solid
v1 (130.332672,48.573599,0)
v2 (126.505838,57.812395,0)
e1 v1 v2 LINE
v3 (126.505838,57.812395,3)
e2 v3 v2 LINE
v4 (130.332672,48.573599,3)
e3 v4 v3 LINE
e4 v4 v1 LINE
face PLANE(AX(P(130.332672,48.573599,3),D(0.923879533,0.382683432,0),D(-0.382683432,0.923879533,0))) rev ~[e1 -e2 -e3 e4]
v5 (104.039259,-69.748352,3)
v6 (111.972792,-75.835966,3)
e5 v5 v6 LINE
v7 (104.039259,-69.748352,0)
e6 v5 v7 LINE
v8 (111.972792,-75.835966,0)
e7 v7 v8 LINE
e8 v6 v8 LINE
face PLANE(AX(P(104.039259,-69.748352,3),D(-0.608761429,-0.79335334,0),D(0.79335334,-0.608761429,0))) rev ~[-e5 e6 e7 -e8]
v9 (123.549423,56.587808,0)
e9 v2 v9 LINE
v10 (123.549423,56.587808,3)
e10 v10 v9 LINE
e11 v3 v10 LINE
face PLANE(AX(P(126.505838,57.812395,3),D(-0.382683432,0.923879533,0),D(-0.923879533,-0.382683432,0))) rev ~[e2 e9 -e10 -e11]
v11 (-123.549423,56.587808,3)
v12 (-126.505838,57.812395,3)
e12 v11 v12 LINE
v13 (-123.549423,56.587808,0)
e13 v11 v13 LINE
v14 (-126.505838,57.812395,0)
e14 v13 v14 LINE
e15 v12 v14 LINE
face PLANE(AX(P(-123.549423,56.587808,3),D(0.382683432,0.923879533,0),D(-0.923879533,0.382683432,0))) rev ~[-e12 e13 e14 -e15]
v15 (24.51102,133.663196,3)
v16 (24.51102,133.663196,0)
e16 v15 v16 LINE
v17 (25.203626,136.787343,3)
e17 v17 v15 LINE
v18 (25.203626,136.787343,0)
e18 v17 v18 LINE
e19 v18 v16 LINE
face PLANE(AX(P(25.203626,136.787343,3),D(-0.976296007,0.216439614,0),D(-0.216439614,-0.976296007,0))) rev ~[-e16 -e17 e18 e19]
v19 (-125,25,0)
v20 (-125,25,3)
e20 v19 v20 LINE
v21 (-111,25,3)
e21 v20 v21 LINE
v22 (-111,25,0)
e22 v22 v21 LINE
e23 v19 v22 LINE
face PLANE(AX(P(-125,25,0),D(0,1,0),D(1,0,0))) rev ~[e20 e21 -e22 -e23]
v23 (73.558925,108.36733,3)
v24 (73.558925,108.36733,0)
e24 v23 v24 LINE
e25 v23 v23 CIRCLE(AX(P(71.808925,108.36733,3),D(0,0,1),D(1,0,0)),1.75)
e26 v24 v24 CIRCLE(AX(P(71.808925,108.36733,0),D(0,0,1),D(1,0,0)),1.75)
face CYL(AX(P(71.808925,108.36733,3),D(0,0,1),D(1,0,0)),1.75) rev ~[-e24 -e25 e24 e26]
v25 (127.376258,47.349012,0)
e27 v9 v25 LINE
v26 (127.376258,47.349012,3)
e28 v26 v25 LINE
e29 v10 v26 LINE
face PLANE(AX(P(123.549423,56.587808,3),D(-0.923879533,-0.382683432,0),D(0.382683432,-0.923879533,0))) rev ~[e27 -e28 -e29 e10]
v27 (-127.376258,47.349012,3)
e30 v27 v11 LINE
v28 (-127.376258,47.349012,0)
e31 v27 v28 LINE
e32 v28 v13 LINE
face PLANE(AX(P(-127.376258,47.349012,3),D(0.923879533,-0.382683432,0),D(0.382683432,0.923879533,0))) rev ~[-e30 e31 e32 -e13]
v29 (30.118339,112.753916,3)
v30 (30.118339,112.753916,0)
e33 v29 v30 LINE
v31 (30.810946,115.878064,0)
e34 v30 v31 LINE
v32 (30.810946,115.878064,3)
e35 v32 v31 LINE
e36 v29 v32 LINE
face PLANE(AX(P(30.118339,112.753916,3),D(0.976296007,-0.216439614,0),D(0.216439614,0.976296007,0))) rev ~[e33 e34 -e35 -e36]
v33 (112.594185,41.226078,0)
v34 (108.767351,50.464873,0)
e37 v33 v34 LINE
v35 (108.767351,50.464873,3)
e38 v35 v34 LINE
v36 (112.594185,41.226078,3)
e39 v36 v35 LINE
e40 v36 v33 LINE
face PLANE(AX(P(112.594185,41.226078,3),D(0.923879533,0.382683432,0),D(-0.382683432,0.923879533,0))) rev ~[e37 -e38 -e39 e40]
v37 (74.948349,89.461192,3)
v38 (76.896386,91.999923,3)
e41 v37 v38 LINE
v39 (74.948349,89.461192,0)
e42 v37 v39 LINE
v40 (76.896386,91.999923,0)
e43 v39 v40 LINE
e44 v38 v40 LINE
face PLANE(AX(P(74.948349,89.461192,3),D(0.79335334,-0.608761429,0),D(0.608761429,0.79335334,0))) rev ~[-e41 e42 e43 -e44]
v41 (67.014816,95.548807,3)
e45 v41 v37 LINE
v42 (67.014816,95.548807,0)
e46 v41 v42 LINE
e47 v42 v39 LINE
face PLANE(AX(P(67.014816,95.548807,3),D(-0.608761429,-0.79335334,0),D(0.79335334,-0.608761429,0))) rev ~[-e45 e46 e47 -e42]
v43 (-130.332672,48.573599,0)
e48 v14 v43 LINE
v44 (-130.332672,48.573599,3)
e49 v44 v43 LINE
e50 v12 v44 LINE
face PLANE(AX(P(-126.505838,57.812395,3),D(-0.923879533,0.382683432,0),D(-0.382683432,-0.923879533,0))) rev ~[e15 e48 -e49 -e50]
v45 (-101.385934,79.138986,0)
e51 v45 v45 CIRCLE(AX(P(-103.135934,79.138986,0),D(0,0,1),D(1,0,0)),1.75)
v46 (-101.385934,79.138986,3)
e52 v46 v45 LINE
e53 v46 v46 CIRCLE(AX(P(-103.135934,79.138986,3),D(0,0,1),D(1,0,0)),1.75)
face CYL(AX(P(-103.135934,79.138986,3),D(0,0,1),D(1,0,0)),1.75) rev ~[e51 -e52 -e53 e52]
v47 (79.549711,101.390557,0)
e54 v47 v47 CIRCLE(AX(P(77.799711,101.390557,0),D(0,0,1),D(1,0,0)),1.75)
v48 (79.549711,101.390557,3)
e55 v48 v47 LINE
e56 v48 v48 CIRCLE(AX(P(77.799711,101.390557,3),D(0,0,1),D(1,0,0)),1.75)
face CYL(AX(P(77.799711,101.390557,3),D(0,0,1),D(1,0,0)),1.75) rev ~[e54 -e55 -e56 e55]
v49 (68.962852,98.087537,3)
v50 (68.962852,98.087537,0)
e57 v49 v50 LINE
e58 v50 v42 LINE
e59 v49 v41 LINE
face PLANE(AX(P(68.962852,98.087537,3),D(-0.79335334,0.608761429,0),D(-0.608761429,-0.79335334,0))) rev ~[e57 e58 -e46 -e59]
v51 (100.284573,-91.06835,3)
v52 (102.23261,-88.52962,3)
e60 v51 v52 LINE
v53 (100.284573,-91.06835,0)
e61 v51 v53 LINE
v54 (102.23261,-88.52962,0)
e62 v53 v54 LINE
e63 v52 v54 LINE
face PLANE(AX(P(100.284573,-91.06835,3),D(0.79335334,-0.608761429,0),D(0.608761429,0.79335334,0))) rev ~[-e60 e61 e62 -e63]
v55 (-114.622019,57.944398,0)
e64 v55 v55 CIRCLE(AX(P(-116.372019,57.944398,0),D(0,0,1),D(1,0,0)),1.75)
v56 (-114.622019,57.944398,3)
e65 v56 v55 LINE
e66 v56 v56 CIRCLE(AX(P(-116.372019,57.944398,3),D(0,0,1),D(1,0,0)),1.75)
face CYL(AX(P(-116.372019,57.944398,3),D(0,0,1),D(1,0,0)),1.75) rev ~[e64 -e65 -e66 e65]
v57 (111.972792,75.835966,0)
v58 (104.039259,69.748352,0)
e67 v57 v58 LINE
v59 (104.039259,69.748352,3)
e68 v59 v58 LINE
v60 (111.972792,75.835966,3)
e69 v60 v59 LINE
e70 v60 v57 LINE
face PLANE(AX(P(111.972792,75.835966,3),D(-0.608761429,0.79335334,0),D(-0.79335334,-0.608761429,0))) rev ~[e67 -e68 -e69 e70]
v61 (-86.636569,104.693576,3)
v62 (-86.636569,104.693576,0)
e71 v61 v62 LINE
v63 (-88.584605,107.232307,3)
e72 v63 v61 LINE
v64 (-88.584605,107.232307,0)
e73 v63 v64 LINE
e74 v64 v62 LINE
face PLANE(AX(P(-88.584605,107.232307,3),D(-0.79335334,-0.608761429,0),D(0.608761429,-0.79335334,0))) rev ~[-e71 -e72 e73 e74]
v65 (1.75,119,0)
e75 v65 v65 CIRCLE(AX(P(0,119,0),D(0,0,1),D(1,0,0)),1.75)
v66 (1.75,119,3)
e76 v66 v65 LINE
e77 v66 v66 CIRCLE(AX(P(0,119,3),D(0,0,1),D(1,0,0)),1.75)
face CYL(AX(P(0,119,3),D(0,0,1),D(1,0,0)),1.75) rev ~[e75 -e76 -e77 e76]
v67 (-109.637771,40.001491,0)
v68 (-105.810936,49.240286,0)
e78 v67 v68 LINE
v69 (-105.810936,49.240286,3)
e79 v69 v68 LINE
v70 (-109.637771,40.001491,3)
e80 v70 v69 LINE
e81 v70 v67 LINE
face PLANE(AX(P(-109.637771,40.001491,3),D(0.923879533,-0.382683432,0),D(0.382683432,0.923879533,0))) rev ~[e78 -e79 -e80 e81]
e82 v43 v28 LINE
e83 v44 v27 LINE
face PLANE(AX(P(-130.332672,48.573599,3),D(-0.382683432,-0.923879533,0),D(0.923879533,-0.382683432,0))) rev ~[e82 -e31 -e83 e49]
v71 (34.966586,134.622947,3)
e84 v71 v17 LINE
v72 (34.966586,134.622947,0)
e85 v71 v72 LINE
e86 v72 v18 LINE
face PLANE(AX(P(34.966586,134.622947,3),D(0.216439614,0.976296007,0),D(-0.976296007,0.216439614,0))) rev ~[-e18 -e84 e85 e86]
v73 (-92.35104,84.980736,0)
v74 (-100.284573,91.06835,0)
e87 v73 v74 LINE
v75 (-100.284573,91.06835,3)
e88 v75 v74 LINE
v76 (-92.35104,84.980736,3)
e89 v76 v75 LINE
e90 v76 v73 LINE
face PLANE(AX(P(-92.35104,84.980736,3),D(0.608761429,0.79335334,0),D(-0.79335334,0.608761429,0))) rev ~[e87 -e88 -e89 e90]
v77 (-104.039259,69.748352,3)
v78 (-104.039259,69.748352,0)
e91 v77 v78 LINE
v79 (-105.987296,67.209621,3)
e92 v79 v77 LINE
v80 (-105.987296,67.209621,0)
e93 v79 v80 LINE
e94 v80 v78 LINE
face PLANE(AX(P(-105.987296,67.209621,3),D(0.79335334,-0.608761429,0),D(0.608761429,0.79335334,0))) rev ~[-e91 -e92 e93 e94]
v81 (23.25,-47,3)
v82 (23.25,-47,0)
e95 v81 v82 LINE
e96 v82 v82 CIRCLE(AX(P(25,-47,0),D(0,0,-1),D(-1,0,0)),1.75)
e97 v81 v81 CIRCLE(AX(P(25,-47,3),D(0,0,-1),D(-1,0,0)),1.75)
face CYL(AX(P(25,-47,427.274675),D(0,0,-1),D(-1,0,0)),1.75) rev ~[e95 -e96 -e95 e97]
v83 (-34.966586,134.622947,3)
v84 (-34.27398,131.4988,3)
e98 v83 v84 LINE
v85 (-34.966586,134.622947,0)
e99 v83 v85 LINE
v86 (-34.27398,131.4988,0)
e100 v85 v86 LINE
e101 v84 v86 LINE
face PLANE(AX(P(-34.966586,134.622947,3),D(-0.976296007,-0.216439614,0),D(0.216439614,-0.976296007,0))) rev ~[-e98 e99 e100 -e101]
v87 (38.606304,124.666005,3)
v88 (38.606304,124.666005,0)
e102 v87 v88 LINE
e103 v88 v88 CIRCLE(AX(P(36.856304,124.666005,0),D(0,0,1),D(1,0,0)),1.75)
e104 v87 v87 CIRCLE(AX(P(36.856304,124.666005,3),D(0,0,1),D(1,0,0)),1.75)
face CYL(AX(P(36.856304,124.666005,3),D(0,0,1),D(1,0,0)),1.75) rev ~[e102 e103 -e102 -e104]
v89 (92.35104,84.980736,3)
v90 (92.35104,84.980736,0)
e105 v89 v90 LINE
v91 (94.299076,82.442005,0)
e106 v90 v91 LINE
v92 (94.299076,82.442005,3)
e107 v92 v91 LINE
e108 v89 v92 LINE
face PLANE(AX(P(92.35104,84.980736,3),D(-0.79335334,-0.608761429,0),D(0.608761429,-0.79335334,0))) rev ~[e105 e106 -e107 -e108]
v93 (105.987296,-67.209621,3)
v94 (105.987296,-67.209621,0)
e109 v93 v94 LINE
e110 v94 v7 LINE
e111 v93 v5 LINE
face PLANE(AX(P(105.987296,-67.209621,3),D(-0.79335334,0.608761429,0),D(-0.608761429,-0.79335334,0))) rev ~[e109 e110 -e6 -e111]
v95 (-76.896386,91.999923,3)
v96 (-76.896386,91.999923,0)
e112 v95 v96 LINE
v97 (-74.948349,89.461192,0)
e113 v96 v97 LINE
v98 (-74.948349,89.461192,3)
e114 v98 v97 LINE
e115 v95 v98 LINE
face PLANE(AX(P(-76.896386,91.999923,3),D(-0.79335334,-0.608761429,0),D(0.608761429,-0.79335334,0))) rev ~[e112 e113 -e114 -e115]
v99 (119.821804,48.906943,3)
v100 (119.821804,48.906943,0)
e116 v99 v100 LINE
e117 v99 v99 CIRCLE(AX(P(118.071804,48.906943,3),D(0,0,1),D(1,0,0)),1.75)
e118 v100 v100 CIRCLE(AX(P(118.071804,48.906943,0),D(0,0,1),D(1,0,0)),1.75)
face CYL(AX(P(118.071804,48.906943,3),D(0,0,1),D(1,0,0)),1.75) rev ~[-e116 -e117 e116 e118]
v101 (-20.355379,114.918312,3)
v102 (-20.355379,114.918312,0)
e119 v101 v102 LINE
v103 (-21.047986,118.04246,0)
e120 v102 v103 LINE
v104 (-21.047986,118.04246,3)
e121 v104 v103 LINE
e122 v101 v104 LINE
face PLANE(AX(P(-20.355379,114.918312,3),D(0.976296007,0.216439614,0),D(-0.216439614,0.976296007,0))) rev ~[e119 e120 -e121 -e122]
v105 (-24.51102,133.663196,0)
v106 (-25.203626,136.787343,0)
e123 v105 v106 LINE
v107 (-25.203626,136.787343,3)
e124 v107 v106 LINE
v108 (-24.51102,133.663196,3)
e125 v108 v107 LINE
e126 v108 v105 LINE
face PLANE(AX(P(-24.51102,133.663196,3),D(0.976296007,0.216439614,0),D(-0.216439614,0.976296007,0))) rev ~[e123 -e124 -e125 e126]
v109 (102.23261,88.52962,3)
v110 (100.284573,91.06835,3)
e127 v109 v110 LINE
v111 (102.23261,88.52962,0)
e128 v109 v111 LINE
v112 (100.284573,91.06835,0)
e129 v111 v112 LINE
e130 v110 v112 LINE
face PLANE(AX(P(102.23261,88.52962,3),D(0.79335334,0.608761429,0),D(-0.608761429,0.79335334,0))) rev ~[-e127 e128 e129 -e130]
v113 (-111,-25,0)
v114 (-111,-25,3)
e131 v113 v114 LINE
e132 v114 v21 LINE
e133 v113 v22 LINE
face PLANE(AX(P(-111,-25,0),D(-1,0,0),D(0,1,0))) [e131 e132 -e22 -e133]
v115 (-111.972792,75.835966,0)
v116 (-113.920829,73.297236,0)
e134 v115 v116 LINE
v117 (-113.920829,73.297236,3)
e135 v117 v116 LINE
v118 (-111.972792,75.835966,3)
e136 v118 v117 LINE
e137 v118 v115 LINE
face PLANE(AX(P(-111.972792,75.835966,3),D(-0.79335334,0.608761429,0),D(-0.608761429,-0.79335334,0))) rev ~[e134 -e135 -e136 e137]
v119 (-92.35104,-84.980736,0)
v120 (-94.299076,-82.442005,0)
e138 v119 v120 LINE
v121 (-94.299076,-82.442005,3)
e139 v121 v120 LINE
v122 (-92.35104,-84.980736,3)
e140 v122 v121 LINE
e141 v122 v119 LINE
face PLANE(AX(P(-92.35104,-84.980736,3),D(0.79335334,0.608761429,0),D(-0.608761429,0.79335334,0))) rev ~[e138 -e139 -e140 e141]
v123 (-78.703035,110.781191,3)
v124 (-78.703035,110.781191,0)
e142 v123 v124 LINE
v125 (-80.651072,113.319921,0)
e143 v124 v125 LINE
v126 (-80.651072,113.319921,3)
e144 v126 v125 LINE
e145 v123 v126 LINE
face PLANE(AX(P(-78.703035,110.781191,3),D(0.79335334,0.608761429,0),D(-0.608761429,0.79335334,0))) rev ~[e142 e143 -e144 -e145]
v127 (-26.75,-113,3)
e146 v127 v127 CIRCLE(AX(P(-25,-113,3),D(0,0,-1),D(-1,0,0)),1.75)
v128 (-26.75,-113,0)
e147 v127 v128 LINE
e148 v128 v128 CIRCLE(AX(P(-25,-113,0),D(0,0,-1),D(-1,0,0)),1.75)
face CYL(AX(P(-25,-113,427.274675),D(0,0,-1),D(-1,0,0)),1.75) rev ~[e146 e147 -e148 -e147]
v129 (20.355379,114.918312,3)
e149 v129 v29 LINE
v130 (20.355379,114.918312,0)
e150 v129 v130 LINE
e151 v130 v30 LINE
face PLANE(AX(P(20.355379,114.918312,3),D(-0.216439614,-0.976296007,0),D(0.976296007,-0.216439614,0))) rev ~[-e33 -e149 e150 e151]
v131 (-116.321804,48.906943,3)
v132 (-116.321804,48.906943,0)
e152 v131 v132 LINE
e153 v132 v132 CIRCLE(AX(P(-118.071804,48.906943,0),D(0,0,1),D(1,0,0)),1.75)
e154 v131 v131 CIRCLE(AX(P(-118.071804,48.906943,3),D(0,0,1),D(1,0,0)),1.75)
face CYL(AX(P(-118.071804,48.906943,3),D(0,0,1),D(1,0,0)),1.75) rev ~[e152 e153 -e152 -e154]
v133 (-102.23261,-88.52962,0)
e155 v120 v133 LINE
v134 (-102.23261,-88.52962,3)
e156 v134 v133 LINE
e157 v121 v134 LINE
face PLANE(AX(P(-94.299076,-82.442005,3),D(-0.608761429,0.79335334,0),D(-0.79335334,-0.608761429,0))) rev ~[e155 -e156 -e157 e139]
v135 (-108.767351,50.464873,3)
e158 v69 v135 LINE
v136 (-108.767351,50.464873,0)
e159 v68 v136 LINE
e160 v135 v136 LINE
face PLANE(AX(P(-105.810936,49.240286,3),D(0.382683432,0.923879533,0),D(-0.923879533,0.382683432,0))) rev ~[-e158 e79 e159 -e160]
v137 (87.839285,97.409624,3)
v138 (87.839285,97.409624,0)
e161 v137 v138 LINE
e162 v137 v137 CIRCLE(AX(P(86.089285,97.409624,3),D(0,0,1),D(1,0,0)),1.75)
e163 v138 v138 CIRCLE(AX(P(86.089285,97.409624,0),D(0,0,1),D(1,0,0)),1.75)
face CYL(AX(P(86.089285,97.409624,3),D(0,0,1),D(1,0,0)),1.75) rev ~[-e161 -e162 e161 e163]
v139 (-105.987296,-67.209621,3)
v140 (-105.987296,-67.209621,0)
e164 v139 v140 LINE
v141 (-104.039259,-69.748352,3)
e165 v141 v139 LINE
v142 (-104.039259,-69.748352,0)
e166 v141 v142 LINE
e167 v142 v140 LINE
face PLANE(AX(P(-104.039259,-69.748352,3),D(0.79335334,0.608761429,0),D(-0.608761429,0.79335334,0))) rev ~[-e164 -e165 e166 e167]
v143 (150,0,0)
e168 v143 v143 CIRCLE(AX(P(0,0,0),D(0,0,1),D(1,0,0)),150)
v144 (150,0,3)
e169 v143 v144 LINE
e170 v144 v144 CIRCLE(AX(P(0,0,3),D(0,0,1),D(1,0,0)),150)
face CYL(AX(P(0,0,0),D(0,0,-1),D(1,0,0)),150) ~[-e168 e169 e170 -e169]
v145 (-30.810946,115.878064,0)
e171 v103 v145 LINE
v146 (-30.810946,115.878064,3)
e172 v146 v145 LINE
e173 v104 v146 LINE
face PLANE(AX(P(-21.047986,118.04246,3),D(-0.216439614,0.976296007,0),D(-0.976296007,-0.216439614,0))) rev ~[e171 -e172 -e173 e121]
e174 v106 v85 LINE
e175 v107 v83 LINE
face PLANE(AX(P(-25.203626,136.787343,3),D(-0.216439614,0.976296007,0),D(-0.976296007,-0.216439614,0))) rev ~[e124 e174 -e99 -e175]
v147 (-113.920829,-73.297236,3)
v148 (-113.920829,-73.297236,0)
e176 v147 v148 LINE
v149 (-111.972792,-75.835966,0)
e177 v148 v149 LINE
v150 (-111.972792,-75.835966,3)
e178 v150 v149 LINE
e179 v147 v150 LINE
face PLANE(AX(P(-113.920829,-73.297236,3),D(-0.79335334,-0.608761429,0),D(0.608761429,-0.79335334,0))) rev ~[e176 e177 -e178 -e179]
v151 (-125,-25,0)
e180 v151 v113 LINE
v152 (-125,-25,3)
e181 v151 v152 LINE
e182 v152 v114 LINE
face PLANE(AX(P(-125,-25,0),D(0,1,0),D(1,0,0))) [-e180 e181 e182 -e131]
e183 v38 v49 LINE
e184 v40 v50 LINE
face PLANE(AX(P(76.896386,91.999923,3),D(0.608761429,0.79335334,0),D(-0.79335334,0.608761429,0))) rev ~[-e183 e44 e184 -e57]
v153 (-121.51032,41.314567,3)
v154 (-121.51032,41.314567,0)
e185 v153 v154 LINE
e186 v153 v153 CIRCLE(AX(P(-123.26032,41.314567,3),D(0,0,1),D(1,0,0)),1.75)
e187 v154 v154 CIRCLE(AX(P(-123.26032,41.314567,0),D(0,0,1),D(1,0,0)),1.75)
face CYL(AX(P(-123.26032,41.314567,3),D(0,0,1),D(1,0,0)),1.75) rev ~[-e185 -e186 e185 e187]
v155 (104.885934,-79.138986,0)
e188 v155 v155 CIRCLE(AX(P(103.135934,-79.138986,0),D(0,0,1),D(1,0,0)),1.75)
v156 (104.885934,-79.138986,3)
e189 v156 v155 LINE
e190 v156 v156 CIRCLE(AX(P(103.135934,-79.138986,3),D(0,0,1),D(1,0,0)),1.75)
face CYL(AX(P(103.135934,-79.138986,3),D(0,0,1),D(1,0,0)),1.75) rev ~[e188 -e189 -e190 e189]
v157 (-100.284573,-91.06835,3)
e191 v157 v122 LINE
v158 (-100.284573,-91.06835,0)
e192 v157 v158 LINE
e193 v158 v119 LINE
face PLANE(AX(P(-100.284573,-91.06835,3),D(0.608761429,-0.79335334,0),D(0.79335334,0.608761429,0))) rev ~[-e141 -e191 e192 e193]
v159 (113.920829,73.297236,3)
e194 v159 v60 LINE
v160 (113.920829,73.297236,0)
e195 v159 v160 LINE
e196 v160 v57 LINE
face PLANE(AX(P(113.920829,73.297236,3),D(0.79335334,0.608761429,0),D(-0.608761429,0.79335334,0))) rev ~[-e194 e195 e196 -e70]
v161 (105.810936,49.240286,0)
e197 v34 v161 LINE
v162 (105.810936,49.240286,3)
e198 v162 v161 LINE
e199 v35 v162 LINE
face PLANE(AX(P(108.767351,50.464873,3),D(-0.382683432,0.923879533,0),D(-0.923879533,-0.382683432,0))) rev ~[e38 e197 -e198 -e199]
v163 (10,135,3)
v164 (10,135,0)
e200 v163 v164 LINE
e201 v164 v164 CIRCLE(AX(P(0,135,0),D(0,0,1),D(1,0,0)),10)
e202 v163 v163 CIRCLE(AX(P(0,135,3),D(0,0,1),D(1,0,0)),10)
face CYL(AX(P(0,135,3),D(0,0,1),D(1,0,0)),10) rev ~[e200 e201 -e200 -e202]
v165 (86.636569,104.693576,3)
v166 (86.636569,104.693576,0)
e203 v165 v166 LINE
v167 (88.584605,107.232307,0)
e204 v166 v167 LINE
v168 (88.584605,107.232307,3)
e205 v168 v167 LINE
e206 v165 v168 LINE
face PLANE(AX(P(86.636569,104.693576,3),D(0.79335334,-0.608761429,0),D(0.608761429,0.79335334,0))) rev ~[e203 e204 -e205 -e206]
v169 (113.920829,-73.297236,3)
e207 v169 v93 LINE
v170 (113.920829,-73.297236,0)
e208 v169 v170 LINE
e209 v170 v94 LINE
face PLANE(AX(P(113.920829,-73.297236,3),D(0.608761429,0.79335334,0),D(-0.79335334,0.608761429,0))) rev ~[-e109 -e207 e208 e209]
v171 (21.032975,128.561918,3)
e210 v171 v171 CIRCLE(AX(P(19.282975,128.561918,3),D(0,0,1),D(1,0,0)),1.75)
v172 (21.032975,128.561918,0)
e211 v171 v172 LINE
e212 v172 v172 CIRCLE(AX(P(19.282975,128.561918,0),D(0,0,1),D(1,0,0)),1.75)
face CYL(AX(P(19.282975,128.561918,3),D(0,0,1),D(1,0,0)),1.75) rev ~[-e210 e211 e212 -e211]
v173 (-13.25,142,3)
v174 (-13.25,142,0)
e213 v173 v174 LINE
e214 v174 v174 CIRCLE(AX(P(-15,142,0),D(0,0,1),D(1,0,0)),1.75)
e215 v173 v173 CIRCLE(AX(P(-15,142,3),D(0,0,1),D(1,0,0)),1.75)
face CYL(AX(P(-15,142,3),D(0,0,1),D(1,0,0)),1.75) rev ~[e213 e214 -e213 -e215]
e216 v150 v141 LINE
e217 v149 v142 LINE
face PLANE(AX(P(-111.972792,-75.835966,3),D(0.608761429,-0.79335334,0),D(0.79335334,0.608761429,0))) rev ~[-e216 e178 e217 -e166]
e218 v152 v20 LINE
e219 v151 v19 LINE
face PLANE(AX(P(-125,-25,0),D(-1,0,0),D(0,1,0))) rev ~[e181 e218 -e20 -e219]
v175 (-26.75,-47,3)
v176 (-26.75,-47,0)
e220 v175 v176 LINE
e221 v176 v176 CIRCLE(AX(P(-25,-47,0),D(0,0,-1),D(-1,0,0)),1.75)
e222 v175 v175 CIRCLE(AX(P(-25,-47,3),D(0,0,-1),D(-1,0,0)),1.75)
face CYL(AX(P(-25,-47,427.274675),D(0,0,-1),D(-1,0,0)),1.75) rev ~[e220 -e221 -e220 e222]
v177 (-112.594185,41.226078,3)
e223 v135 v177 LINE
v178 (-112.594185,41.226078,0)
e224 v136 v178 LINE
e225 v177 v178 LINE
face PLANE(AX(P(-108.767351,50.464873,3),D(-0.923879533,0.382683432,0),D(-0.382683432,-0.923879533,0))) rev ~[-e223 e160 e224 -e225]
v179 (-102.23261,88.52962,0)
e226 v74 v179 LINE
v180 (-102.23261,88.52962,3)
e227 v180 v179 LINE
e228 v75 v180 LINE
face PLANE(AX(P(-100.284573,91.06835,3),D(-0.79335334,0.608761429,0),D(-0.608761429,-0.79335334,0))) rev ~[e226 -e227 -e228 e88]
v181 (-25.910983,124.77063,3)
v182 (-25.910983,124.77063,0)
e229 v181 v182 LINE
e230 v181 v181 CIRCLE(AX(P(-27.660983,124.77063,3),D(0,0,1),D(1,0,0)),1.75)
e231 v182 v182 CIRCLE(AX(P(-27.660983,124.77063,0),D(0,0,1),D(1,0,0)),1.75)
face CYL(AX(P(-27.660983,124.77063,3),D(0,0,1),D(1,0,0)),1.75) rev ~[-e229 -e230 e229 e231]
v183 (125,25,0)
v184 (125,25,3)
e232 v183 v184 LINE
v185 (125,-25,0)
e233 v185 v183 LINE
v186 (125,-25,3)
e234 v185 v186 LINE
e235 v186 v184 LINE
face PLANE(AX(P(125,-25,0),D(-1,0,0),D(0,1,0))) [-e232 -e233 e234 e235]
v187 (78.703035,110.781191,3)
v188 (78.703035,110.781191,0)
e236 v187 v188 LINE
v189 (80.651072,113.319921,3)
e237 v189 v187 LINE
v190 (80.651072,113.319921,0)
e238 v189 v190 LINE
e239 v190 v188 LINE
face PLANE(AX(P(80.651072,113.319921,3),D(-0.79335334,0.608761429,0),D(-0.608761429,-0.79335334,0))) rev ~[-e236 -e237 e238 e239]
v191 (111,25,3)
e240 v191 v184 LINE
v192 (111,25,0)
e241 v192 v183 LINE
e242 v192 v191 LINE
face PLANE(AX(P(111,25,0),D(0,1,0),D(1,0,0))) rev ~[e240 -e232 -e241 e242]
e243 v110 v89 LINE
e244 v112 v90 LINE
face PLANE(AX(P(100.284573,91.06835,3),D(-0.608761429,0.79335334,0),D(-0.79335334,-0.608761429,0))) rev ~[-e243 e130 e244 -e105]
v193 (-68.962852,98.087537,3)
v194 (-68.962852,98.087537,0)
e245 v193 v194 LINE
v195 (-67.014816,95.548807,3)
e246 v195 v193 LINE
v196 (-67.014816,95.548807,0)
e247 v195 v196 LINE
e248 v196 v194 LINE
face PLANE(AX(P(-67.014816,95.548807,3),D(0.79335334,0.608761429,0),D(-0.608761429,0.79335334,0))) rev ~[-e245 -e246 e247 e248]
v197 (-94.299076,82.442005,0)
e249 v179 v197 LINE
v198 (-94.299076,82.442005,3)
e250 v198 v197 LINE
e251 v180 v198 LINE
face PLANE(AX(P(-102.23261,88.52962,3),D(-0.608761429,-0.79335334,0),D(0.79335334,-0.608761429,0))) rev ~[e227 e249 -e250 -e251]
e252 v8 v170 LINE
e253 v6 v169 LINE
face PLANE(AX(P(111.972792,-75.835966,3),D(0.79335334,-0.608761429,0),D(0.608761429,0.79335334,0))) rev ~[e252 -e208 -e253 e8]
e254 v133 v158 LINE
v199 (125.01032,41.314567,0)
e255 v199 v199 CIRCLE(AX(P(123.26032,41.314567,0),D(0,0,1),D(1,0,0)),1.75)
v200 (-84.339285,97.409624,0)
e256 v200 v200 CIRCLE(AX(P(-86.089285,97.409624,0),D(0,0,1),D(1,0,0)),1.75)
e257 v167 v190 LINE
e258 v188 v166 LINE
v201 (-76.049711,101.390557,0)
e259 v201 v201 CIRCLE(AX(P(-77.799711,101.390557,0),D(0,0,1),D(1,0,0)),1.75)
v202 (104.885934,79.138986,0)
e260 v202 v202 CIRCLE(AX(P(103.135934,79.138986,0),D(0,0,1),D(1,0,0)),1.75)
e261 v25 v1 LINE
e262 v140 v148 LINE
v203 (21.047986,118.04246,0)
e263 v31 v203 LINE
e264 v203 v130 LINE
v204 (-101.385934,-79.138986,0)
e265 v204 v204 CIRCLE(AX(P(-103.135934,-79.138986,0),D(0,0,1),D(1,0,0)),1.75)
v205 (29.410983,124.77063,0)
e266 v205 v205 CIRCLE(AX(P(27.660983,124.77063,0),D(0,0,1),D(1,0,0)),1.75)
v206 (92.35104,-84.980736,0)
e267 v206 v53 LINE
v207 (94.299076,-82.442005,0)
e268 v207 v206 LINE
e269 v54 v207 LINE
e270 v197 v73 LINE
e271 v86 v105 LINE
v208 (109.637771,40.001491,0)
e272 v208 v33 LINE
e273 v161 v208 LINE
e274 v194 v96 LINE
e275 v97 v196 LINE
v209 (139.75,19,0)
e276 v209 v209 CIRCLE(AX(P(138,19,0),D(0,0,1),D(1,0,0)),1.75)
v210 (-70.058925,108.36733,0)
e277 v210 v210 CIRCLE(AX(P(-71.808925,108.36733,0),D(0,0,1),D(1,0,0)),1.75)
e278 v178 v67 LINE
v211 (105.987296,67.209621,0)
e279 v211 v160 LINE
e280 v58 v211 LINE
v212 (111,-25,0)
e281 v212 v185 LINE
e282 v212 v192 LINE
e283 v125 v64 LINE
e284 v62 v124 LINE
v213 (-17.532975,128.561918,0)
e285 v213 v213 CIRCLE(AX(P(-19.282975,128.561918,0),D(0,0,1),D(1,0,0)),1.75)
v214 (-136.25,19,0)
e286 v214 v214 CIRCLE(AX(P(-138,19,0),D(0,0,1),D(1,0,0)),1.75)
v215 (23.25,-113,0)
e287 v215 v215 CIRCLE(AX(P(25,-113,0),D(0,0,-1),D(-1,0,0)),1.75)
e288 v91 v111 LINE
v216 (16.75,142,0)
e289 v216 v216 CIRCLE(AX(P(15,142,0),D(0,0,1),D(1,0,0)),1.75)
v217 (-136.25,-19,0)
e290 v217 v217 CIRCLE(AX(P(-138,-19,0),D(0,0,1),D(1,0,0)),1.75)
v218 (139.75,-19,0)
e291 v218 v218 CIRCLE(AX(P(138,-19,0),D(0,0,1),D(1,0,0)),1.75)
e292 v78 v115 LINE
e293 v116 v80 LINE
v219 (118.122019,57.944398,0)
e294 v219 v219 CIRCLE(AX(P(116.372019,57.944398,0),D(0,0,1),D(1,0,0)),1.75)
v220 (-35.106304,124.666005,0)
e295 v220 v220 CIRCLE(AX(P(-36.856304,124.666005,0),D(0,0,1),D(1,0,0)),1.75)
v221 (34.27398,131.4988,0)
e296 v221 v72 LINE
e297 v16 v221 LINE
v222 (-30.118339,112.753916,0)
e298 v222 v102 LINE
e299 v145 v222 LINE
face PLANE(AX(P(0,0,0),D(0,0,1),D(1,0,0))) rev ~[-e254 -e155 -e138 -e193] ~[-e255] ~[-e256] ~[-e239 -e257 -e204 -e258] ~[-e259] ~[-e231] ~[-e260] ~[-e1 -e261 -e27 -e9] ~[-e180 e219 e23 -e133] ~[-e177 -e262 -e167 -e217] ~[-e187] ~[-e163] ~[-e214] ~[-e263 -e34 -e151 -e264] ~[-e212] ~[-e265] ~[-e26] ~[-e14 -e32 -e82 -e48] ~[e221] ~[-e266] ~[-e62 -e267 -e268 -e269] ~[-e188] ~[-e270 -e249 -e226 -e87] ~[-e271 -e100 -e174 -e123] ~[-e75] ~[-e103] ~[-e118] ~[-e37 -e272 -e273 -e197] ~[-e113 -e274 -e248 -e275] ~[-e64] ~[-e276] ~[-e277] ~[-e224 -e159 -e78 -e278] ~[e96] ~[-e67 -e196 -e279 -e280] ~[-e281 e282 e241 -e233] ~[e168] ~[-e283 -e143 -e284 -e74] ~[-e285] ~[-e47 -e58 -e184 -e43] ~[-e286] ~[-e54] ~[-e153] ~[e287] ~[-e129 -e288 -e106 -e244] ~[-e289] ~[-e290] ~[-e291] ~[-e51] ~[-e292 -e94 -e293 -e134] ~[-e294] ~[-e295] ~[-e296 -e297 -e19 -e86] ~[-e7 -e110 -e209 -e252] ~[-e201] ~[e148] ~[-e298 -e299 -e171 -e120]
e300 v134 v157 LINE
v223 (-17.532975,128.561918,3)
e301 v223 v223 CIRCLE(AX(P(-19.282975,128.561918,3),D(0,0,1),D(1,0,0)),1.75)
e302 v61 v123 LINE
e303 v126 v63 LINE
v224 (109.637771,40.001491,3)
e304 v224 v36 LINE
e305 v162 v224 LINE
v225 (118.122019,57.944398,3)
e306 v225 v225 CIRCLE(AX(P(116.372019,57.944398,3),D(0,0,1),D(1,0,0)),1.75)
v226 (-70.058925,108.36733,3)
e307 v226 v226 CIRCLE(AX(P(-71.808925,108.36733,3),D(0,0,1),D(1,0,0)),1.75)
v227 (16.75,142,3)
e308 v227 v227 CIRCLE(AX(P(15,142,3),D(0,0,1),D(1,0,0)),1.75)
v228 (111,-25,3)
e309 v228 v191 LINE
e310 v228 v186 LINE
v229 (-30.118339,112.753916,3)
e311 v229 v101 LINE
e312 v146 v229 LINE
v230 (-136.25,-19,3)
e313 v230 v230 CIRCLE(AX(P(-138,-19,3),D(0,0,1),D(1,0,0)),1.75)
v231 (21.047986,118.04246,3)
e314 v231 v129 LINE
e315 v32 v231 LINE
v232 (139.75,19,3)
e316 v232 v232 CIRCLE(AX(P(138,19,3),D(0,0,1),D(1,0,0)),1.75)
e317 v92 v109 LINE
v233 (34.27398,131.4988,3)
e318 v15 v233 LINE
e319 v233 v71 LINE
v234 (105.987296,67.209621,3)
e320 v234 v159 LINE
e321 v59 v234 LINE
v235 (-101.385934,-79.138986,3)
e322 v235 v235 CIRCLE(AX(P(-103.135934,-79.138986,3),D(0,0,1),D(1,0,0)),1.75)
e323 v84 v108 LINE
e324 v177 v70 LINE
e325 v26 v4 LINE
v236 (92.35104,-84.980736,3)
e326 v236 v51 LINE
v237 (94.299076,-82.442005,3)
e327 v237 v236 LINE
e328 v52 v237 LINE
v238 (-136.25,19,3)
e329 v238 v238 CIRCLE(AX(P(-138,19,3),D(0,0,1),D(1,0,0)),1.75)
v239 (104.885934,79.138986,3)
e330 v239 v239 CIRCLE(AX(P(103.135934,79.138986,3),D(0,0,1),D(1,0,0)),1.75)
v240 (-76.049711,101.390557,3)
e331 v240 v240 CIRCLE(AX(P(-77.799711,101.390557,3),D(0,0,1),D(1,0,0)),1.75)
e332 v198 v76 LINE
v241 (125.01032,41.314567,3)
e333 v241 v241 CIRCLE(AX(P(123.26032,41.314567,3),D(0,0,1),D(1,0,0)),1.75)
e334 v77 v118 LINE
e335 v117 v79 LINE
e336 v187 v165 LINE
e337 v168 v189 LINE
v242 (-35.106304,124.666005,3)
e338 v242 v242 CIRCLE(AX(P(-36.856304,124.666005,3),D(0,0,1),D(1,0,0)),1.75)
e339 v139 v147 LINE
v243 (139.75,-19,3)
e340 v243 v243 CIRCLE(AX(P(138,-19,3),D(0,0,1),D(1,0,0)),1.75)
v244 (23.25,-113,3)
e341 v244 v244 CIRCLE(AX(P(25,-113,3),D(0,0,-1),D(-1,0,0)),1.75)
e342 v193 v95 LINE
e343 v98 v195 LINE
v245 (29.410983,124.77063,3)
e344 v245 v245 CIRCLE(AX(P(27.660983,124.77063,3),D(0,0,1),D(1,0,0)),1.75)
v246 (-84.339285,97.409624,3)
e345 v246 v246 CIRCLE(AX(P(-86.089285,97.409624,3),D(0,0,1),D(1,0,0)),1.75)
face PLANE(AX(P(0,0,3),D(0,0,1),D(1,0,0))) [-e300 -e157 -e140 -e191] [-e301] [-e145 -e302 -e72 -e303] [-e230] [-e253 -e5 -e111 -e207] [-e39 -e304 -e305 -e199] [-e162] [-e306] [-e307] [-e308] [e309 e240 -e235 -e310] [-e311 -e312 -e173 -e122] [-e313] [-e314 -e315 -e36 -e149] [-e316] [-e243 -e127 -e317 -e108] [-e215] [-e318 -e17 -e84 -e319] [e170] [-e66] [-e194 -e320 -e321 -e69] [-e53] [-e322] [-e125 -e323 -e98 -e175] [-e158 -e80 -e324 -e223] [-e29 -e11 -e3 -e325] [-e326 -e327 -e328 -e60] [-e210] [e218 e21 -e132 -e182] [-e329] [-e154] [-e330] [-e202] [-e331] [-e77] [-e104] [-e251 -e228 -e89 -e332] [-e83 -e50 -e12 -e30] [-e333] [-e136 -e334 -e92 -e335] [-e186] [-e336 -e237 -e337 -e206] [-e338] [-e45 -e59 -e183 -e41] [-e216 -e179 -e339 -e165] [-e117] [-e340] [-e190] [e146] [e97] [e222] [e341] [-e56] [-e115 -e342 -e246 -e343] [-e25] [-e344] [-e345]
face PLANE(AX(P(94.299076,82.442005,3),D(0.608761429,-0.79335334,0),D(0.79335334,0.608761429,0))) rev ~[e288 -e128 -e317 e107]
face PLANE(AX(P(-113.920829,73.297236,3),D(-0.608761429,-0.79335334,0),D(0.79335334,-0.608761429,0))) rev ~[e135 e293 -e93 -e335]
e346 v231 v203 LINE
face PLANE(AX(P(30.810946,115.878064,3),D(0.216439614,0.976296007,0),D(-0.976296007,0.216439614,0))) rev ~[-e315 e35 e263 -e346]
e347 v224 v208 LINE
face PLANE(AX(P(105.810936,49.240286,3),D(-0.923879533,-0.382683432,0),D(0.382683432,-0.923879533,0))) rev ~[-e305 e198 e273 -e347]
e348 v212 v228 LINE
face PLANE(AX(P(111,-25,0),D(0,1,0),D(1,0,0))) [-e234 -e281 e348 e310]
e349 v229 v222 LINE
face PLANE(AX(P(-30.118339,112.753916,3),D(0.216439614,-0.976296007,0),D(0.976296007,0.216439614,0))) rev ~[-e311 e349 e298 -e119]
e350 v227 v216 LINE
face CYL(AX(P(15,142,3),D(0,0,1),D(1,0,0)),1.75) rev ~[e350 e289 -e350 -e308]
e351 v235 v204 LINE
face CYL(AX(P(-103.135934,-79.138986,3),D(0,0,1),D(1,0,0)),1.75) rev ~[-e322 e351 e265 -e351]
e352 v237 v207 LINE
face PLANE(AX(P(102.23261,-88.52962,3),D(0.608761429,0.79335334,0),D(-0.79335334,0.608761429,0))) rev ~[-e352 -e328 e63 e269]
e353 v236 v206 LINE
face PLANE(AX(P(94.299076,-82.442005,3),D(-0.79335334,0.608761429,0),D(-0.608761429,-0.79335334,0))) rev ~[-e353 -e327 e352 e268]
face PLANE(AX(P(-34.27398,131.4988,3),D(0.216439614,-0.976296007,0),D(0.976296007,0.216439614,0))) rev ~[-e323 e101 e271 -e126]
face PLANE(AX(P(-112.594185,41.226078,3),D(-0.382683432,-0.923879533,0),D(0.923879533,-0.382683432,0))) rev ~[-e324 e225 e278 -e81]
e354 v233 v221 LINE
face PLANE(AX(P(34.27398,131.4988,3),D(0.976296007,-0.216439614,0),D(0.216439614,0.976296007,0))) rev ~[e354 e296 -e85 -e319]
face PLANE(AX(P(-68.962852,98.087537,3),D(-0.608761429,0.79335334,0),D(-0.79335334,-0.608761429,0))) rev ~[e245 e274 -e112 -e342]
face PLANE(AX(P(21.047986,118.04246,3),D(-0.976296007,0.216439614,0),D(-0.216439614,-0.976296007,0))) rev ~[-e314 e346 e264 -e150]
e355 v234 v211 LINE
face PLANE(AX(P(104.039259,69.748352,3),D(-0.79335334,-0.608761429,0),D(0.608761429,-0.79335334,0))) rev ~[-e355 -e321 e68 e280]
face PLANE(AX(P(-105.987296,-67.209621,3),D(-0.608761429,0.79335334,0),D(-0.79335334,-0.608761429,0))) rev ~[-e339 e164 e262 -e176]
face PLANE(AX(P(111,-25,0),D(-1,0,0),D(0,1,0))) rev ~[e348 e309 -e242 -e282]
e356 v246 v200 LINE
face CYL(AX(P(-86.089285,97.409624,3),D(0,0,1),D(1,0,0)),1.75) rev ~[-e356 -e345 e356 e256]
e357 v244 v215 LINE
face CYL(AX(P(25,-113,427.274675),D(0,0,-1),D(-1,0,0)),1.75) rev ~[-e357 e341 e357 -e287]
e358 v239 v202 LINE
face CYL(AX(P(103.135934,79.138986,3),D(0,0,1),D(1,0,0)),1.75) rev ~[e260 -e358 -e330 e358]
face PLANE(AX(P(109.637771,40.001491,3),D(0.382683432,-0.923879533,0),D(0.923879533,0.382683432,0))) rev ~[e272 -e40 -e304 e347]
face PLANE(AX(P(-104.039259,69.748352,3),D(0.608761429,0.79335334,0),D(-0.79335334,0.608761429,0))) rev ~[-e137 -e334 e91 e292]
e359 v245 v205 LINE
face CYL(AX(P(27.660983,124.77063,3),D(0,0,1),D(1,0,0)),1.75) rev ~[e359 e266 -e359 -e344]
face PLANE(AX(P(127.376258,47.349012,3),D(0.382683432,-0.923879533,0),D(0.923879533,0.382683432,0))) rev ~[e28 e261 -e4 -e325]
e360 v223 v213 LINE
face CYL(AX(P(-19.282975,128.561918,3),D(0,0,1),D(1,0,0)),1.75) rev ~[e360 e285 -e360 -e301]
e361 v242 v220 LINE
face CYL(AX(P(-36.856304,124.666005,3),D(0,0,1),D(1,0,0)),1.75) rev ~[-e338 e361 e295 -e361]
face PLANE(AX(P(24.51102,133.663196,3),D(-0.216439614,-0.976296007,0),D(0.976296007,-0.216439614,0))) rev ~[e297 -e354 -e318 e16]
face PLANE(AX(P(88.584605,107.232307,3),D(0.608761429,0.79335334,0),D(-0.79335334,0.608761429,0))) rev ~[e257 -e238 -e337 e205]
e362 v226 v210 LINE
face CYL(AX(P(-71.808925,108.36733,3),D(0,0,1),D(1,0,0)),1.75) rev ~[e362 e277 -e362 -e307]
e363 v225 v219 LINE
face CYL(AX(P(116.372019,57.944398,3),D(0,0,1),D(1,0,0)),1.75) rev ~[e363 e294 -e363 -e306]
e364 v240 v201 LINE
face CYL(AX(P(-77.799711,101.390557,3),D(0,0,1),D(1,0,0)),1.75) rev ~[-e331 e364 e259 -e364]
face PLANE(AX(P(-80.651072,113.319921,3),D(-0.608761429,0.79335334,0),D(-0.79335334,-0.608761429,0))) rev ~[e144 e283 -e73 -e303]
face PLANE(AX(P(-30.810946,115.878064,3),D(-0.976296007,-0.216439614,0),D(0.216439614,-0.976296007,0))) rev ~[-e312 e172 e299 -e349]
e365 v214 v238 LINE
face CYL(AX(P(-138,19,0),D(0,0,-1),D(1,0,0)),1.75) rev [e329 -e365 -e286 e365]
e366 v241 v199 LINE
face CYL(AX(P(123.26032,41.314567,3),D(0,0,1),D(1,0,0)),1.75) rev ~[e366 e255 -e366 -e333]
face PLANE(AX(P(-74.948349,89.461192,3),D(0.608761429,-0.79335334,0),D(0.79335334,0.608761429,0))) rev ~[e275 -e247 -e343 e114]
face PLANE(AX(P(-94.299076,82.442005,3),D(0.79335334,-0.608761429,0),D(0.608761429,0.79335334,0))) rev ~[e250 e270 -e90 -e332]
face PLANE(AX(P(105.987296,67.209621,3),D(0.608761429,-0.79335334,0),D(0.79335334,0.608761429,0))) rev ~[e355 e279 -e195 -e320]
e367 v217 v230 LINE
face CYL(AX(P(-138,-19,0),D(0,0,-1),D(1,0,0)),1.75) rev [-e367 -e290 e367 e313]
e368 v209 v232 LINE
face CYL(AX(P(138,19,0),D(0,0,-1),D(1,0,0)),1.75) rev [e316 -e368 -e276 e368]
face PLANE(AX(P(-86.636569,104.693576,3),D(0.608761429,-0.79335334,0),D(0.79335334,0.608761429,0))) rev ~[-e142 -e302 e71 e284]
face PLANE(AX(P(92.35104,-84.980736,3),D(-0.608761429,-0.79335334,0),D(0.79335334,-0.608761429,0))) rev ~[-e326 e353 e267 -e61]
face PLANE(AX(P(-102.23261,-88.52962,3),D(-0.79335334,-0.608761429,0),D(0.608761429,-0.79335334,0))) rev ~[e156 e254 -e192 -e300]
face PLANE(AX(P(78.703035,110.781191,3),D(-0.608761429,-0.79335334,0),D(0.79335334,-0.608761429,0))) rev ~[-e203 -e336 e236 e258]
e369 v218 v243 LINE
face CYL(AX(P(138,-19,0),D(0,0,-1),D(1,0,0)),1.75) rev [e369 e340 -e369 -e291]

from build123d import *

# Parameters (mm, degrees)
F0_R     = 150
F0_R_2   = 1.75
F0_W     = 14
F0_H     = 50
F1_DEPTH = 3
F2_R     = 1.75
F3_DEPTH = 3
F4_R     = 1.75
F4_R_2   = 10
F5_DEPTH = 3
F6_R     = 1.75
F7_DEPTH = 25
F9_D     = 3.5


# Not quite as in the source:
# - a feature names something its author has since deleted; it is built from what else it names


with BuildPart() as f1:
    # F0 (on Top) → F1 (new body)
    with BuildSketch(Plane.XY):
        Circle(F0_R)
        with Locations((-138, -19)):
            Circle(F0_R_2, mode=Mode.SUBTRACT)
        with Locations((138, -19)):
            Circle(F0_R_2, mode=Mode.SUBTRACT)
        with Locations((-118, 0)):
            Rectangle(F0_W, F0_H, mode=Mode.SUBTRACT)
        with Locations((-138, 19)):
            Circle(F0_R_2, mode=Mode.SUBTRACT)
        with Locations((118, 0)):
            Rectangle(F0_W, F0_H, mode=Mode.SUBTRACT)
        with Locations((138, 19)):
            Circle(F0_R_2, mode=Mode.SUBTRACT)
    extrude(amount=F1_DEPTH)

    # F2 (on face) → F3 (cut, through all)
    with BuildSketch(Plane.XY.offset(3)):
        with Locations((-123.2603204027, 41.3145666106)):
            Circle(F2_R)
        with Locations((-116.3720186201, 57.9443981958)):
            Circle(F2_R)
        with Locations((-86.089285442, 97.4096244325)):
            Circle(F2_R)
        with Locations((-71.8089253168, 108.3673301546)):
            Circle(F2_R)
        with Locations((-36.8563036221, 124.6660053235)):
            Circle(F2_R)
        with Locations((-19.2829754939, 128.5619183744)):
            Circle(F2_R)
        with Locations((19.2829754939, 128.5619183744)):
            Circle(F2_R)
        with Locations((36.8563036221, 124.6660053235)):
            Circle(F2_R)
        with Locations((71.8089253168, 108.3673301546)):
            Circle(F2_R)
        with Locations((86.089285442, 97.4096244325)):
            Circle(F2_R)
        with Locations((116.3720186201, 57.9443981958)):
            Circle(F2_R)
        with Locations((123.2603204027, 41.3145666106)):
            Circle(F2_R)
        Polygon((-126.5058378572, 57.8123947613), (-130.3326721809, 48.5735994362), (-127.3762576769, 47.3490124526), (-123.5494233532, 56.5878077777), align=None)
        Polygon((-105.810936329, 49.2402858763), (-108.767350833, 50.4648728599), (-112.5941851567, 41.2260775348), (-109.6377706526, 40.0014905512), align=None)
        with Locations((-118.0718042549, 48.9069426563)):
            Circle(F2_R)
        Polygon((-86.6365687608, 104.6935764665), (-78.7030353579, 110.7811907566), (-80.6510719308, 113.3199214455), (-88.5846053337, 107.2323071554), align=None)
        with Locations((-77.7997106273, 101.3905568892)):
            Circle(F2_R)
        Polygon((-67.014815921, 95.548806623), (-68.9628524938, 98.0875373119), (-76.8963858967, 91.9999230218), (-74.9483493239, 89.4611923329), align=None)
        Polygon((80.6510719308, 113.3199214455), (78.7030353579, 110.7811907566), (86.6365687608, 104.6935764665), (88.5846053337, 107.2323071554), align=None)
        with Locations((77.7997106273, 101.3905568892)):
            Circle(F2_R)
        Polygon((67.014815921, 95.548806623), (74.9483493239, 89.4611923329), (76.8963858967, 91.9999230218), (68.9628524938, 98.0875373119), align=None)
        Polygon((123.5494233532, 56.5878077777), (127.3762576769, 47.3490124526), (130.3326721809, 48.5735994362), (126.5058378572, 57.8123947613), align=None)
        with Locations((118.0718042549, 48.9069426563)):
            Circle(F2_R)
        Polygon((105.810936329, 49.2402858763), (109.6377706526, 40.0014905512), (112.5941851567, 41.2260775348), (108.767350833, 50.4648728599), align=None)
        Polygon((-25.2036263018, 136.7873430594), (-34.966586373, 134.62294692), (-34.2739796084, 131.4987996972), (-24.5110195372, 133.6631958366), align=None)
        with Locations((-27.6609826613, 124.7706297099)):
            Circle(F2_R)
        Polygon((-21.0479857142, 118.0424597227), (-30.8109457854, 115.8780635833), (-30.1183390208, 112.7539163605), (-20.3553789496, 114.9183124999), align=None)
        Polygon((34.966586373, 134.62294692), (25.2036263018, 136.7873430594), (24.5110195372, 133.6631958366), (34.2739796084, 131.4987996972), align=None)
        with Locations((27.6609826613, 124.7706297099)):
            Circle(F2_R)
        Polygon((30.1183390208, 112.7539163605), (30.8109457854, 115.8780635833), (21.0479857142, 118.0424597227), (20.3553789496, 114.9183124999), align=None)
    extrude(amount=-F3_DEPTH, mode=Mode.SUBTRACT)

    # F4 (on face) → F5 (cut, through all)
    with BuildSketch(Plane.XY.offset(3)):
        with Locations((-15, 142)):
            Circle(F4_R)
        with Locations((15, 142)):
            Circle(F4_R)
        with Locations((0, 119)):
            Circle(F4_R)
        with Locations((0, 135)):
            Circle(F4_R_2)
    extrude(amount=-F5_DEPTH, mode=Mode.SUBTRACT)

    # F6 (on face) → F7 (cut)
    with BuildSketch(Plane.XY.offset(3)):
        Polygon((-105.9872955413, -67.2096212148), (-113.9208289442, -73.2972355049), (-111.9727923714, -75.8359661938), (-104.0392589685, -69.7483519038), align=None)
        with Locations((-103.1359342379, -79.1389857711)):
            Circle(F6_R)
        Polygon((-92.3510395315, -84.9807360374), (-94.2990761043, -82.4420053484), (-102.2326095072, -88.5296196385), (-100.2845729344, -91.0683503274), align=None)
        Polygon((92.3510395315, -84.9807360374), (100.2845729344, -91.0683503274), (102.2326095072, -88.5296196385), (94.2990761043, -82.4420053484), align=None)
        with Locations((103.1359342379, -79.1389857711)):
            Circle(F6_R)
        Polygon((105.9872955413, -67.2096212148), (104.0392589685, -69.7483519038), (111.9727923714, -75.8359661938), (113.9208289442, -73.2972355049), align=None)
        Polygon((111.9727923714, 75.8359661938), (104.0392589685, 69.7483519038), (105.9872955413, 67.2096212148), (113.9208289442, 73.2972355049), align=None)
        with Locations((103.1359342379, 79.1389857711)):
            Circle(F6_R)
        Polygon((94.2990761043, 82.4420053484), (102.2326095072, 88.5296196385), (100.2845729344, 91.0683503274), (92.3510395315, 84.9807360374), align=None)
        Polygon((-92.3510395315, 84.9807360374), (-100.2845729344, 91.0683503274), (-102.2326095072, 88.5296196385), (-94.2990761043, 82.4420053484), align=None)
        with Locations((-103.1359342379, 79.1389857711)):
            Circle(F6_R)
        Polygon((-111.9727923714, 75.8359661938), (-113.9208289442, 73.2972355049), (-105.9872955413, 67.2096212148), (-104.0392589685, 69.7483519038), align=None)
    extrude(amount=-F7_DEPTH, mode=Mode.SUBTRACT)

    # F9 (through all)
    with Locations(Plane.XY.offset(3)):
        with Locations((-25, -47), (25, -47), (25, -113), (-25, -113)):
            Hole(F9_D / 2)


solid = f1.part
